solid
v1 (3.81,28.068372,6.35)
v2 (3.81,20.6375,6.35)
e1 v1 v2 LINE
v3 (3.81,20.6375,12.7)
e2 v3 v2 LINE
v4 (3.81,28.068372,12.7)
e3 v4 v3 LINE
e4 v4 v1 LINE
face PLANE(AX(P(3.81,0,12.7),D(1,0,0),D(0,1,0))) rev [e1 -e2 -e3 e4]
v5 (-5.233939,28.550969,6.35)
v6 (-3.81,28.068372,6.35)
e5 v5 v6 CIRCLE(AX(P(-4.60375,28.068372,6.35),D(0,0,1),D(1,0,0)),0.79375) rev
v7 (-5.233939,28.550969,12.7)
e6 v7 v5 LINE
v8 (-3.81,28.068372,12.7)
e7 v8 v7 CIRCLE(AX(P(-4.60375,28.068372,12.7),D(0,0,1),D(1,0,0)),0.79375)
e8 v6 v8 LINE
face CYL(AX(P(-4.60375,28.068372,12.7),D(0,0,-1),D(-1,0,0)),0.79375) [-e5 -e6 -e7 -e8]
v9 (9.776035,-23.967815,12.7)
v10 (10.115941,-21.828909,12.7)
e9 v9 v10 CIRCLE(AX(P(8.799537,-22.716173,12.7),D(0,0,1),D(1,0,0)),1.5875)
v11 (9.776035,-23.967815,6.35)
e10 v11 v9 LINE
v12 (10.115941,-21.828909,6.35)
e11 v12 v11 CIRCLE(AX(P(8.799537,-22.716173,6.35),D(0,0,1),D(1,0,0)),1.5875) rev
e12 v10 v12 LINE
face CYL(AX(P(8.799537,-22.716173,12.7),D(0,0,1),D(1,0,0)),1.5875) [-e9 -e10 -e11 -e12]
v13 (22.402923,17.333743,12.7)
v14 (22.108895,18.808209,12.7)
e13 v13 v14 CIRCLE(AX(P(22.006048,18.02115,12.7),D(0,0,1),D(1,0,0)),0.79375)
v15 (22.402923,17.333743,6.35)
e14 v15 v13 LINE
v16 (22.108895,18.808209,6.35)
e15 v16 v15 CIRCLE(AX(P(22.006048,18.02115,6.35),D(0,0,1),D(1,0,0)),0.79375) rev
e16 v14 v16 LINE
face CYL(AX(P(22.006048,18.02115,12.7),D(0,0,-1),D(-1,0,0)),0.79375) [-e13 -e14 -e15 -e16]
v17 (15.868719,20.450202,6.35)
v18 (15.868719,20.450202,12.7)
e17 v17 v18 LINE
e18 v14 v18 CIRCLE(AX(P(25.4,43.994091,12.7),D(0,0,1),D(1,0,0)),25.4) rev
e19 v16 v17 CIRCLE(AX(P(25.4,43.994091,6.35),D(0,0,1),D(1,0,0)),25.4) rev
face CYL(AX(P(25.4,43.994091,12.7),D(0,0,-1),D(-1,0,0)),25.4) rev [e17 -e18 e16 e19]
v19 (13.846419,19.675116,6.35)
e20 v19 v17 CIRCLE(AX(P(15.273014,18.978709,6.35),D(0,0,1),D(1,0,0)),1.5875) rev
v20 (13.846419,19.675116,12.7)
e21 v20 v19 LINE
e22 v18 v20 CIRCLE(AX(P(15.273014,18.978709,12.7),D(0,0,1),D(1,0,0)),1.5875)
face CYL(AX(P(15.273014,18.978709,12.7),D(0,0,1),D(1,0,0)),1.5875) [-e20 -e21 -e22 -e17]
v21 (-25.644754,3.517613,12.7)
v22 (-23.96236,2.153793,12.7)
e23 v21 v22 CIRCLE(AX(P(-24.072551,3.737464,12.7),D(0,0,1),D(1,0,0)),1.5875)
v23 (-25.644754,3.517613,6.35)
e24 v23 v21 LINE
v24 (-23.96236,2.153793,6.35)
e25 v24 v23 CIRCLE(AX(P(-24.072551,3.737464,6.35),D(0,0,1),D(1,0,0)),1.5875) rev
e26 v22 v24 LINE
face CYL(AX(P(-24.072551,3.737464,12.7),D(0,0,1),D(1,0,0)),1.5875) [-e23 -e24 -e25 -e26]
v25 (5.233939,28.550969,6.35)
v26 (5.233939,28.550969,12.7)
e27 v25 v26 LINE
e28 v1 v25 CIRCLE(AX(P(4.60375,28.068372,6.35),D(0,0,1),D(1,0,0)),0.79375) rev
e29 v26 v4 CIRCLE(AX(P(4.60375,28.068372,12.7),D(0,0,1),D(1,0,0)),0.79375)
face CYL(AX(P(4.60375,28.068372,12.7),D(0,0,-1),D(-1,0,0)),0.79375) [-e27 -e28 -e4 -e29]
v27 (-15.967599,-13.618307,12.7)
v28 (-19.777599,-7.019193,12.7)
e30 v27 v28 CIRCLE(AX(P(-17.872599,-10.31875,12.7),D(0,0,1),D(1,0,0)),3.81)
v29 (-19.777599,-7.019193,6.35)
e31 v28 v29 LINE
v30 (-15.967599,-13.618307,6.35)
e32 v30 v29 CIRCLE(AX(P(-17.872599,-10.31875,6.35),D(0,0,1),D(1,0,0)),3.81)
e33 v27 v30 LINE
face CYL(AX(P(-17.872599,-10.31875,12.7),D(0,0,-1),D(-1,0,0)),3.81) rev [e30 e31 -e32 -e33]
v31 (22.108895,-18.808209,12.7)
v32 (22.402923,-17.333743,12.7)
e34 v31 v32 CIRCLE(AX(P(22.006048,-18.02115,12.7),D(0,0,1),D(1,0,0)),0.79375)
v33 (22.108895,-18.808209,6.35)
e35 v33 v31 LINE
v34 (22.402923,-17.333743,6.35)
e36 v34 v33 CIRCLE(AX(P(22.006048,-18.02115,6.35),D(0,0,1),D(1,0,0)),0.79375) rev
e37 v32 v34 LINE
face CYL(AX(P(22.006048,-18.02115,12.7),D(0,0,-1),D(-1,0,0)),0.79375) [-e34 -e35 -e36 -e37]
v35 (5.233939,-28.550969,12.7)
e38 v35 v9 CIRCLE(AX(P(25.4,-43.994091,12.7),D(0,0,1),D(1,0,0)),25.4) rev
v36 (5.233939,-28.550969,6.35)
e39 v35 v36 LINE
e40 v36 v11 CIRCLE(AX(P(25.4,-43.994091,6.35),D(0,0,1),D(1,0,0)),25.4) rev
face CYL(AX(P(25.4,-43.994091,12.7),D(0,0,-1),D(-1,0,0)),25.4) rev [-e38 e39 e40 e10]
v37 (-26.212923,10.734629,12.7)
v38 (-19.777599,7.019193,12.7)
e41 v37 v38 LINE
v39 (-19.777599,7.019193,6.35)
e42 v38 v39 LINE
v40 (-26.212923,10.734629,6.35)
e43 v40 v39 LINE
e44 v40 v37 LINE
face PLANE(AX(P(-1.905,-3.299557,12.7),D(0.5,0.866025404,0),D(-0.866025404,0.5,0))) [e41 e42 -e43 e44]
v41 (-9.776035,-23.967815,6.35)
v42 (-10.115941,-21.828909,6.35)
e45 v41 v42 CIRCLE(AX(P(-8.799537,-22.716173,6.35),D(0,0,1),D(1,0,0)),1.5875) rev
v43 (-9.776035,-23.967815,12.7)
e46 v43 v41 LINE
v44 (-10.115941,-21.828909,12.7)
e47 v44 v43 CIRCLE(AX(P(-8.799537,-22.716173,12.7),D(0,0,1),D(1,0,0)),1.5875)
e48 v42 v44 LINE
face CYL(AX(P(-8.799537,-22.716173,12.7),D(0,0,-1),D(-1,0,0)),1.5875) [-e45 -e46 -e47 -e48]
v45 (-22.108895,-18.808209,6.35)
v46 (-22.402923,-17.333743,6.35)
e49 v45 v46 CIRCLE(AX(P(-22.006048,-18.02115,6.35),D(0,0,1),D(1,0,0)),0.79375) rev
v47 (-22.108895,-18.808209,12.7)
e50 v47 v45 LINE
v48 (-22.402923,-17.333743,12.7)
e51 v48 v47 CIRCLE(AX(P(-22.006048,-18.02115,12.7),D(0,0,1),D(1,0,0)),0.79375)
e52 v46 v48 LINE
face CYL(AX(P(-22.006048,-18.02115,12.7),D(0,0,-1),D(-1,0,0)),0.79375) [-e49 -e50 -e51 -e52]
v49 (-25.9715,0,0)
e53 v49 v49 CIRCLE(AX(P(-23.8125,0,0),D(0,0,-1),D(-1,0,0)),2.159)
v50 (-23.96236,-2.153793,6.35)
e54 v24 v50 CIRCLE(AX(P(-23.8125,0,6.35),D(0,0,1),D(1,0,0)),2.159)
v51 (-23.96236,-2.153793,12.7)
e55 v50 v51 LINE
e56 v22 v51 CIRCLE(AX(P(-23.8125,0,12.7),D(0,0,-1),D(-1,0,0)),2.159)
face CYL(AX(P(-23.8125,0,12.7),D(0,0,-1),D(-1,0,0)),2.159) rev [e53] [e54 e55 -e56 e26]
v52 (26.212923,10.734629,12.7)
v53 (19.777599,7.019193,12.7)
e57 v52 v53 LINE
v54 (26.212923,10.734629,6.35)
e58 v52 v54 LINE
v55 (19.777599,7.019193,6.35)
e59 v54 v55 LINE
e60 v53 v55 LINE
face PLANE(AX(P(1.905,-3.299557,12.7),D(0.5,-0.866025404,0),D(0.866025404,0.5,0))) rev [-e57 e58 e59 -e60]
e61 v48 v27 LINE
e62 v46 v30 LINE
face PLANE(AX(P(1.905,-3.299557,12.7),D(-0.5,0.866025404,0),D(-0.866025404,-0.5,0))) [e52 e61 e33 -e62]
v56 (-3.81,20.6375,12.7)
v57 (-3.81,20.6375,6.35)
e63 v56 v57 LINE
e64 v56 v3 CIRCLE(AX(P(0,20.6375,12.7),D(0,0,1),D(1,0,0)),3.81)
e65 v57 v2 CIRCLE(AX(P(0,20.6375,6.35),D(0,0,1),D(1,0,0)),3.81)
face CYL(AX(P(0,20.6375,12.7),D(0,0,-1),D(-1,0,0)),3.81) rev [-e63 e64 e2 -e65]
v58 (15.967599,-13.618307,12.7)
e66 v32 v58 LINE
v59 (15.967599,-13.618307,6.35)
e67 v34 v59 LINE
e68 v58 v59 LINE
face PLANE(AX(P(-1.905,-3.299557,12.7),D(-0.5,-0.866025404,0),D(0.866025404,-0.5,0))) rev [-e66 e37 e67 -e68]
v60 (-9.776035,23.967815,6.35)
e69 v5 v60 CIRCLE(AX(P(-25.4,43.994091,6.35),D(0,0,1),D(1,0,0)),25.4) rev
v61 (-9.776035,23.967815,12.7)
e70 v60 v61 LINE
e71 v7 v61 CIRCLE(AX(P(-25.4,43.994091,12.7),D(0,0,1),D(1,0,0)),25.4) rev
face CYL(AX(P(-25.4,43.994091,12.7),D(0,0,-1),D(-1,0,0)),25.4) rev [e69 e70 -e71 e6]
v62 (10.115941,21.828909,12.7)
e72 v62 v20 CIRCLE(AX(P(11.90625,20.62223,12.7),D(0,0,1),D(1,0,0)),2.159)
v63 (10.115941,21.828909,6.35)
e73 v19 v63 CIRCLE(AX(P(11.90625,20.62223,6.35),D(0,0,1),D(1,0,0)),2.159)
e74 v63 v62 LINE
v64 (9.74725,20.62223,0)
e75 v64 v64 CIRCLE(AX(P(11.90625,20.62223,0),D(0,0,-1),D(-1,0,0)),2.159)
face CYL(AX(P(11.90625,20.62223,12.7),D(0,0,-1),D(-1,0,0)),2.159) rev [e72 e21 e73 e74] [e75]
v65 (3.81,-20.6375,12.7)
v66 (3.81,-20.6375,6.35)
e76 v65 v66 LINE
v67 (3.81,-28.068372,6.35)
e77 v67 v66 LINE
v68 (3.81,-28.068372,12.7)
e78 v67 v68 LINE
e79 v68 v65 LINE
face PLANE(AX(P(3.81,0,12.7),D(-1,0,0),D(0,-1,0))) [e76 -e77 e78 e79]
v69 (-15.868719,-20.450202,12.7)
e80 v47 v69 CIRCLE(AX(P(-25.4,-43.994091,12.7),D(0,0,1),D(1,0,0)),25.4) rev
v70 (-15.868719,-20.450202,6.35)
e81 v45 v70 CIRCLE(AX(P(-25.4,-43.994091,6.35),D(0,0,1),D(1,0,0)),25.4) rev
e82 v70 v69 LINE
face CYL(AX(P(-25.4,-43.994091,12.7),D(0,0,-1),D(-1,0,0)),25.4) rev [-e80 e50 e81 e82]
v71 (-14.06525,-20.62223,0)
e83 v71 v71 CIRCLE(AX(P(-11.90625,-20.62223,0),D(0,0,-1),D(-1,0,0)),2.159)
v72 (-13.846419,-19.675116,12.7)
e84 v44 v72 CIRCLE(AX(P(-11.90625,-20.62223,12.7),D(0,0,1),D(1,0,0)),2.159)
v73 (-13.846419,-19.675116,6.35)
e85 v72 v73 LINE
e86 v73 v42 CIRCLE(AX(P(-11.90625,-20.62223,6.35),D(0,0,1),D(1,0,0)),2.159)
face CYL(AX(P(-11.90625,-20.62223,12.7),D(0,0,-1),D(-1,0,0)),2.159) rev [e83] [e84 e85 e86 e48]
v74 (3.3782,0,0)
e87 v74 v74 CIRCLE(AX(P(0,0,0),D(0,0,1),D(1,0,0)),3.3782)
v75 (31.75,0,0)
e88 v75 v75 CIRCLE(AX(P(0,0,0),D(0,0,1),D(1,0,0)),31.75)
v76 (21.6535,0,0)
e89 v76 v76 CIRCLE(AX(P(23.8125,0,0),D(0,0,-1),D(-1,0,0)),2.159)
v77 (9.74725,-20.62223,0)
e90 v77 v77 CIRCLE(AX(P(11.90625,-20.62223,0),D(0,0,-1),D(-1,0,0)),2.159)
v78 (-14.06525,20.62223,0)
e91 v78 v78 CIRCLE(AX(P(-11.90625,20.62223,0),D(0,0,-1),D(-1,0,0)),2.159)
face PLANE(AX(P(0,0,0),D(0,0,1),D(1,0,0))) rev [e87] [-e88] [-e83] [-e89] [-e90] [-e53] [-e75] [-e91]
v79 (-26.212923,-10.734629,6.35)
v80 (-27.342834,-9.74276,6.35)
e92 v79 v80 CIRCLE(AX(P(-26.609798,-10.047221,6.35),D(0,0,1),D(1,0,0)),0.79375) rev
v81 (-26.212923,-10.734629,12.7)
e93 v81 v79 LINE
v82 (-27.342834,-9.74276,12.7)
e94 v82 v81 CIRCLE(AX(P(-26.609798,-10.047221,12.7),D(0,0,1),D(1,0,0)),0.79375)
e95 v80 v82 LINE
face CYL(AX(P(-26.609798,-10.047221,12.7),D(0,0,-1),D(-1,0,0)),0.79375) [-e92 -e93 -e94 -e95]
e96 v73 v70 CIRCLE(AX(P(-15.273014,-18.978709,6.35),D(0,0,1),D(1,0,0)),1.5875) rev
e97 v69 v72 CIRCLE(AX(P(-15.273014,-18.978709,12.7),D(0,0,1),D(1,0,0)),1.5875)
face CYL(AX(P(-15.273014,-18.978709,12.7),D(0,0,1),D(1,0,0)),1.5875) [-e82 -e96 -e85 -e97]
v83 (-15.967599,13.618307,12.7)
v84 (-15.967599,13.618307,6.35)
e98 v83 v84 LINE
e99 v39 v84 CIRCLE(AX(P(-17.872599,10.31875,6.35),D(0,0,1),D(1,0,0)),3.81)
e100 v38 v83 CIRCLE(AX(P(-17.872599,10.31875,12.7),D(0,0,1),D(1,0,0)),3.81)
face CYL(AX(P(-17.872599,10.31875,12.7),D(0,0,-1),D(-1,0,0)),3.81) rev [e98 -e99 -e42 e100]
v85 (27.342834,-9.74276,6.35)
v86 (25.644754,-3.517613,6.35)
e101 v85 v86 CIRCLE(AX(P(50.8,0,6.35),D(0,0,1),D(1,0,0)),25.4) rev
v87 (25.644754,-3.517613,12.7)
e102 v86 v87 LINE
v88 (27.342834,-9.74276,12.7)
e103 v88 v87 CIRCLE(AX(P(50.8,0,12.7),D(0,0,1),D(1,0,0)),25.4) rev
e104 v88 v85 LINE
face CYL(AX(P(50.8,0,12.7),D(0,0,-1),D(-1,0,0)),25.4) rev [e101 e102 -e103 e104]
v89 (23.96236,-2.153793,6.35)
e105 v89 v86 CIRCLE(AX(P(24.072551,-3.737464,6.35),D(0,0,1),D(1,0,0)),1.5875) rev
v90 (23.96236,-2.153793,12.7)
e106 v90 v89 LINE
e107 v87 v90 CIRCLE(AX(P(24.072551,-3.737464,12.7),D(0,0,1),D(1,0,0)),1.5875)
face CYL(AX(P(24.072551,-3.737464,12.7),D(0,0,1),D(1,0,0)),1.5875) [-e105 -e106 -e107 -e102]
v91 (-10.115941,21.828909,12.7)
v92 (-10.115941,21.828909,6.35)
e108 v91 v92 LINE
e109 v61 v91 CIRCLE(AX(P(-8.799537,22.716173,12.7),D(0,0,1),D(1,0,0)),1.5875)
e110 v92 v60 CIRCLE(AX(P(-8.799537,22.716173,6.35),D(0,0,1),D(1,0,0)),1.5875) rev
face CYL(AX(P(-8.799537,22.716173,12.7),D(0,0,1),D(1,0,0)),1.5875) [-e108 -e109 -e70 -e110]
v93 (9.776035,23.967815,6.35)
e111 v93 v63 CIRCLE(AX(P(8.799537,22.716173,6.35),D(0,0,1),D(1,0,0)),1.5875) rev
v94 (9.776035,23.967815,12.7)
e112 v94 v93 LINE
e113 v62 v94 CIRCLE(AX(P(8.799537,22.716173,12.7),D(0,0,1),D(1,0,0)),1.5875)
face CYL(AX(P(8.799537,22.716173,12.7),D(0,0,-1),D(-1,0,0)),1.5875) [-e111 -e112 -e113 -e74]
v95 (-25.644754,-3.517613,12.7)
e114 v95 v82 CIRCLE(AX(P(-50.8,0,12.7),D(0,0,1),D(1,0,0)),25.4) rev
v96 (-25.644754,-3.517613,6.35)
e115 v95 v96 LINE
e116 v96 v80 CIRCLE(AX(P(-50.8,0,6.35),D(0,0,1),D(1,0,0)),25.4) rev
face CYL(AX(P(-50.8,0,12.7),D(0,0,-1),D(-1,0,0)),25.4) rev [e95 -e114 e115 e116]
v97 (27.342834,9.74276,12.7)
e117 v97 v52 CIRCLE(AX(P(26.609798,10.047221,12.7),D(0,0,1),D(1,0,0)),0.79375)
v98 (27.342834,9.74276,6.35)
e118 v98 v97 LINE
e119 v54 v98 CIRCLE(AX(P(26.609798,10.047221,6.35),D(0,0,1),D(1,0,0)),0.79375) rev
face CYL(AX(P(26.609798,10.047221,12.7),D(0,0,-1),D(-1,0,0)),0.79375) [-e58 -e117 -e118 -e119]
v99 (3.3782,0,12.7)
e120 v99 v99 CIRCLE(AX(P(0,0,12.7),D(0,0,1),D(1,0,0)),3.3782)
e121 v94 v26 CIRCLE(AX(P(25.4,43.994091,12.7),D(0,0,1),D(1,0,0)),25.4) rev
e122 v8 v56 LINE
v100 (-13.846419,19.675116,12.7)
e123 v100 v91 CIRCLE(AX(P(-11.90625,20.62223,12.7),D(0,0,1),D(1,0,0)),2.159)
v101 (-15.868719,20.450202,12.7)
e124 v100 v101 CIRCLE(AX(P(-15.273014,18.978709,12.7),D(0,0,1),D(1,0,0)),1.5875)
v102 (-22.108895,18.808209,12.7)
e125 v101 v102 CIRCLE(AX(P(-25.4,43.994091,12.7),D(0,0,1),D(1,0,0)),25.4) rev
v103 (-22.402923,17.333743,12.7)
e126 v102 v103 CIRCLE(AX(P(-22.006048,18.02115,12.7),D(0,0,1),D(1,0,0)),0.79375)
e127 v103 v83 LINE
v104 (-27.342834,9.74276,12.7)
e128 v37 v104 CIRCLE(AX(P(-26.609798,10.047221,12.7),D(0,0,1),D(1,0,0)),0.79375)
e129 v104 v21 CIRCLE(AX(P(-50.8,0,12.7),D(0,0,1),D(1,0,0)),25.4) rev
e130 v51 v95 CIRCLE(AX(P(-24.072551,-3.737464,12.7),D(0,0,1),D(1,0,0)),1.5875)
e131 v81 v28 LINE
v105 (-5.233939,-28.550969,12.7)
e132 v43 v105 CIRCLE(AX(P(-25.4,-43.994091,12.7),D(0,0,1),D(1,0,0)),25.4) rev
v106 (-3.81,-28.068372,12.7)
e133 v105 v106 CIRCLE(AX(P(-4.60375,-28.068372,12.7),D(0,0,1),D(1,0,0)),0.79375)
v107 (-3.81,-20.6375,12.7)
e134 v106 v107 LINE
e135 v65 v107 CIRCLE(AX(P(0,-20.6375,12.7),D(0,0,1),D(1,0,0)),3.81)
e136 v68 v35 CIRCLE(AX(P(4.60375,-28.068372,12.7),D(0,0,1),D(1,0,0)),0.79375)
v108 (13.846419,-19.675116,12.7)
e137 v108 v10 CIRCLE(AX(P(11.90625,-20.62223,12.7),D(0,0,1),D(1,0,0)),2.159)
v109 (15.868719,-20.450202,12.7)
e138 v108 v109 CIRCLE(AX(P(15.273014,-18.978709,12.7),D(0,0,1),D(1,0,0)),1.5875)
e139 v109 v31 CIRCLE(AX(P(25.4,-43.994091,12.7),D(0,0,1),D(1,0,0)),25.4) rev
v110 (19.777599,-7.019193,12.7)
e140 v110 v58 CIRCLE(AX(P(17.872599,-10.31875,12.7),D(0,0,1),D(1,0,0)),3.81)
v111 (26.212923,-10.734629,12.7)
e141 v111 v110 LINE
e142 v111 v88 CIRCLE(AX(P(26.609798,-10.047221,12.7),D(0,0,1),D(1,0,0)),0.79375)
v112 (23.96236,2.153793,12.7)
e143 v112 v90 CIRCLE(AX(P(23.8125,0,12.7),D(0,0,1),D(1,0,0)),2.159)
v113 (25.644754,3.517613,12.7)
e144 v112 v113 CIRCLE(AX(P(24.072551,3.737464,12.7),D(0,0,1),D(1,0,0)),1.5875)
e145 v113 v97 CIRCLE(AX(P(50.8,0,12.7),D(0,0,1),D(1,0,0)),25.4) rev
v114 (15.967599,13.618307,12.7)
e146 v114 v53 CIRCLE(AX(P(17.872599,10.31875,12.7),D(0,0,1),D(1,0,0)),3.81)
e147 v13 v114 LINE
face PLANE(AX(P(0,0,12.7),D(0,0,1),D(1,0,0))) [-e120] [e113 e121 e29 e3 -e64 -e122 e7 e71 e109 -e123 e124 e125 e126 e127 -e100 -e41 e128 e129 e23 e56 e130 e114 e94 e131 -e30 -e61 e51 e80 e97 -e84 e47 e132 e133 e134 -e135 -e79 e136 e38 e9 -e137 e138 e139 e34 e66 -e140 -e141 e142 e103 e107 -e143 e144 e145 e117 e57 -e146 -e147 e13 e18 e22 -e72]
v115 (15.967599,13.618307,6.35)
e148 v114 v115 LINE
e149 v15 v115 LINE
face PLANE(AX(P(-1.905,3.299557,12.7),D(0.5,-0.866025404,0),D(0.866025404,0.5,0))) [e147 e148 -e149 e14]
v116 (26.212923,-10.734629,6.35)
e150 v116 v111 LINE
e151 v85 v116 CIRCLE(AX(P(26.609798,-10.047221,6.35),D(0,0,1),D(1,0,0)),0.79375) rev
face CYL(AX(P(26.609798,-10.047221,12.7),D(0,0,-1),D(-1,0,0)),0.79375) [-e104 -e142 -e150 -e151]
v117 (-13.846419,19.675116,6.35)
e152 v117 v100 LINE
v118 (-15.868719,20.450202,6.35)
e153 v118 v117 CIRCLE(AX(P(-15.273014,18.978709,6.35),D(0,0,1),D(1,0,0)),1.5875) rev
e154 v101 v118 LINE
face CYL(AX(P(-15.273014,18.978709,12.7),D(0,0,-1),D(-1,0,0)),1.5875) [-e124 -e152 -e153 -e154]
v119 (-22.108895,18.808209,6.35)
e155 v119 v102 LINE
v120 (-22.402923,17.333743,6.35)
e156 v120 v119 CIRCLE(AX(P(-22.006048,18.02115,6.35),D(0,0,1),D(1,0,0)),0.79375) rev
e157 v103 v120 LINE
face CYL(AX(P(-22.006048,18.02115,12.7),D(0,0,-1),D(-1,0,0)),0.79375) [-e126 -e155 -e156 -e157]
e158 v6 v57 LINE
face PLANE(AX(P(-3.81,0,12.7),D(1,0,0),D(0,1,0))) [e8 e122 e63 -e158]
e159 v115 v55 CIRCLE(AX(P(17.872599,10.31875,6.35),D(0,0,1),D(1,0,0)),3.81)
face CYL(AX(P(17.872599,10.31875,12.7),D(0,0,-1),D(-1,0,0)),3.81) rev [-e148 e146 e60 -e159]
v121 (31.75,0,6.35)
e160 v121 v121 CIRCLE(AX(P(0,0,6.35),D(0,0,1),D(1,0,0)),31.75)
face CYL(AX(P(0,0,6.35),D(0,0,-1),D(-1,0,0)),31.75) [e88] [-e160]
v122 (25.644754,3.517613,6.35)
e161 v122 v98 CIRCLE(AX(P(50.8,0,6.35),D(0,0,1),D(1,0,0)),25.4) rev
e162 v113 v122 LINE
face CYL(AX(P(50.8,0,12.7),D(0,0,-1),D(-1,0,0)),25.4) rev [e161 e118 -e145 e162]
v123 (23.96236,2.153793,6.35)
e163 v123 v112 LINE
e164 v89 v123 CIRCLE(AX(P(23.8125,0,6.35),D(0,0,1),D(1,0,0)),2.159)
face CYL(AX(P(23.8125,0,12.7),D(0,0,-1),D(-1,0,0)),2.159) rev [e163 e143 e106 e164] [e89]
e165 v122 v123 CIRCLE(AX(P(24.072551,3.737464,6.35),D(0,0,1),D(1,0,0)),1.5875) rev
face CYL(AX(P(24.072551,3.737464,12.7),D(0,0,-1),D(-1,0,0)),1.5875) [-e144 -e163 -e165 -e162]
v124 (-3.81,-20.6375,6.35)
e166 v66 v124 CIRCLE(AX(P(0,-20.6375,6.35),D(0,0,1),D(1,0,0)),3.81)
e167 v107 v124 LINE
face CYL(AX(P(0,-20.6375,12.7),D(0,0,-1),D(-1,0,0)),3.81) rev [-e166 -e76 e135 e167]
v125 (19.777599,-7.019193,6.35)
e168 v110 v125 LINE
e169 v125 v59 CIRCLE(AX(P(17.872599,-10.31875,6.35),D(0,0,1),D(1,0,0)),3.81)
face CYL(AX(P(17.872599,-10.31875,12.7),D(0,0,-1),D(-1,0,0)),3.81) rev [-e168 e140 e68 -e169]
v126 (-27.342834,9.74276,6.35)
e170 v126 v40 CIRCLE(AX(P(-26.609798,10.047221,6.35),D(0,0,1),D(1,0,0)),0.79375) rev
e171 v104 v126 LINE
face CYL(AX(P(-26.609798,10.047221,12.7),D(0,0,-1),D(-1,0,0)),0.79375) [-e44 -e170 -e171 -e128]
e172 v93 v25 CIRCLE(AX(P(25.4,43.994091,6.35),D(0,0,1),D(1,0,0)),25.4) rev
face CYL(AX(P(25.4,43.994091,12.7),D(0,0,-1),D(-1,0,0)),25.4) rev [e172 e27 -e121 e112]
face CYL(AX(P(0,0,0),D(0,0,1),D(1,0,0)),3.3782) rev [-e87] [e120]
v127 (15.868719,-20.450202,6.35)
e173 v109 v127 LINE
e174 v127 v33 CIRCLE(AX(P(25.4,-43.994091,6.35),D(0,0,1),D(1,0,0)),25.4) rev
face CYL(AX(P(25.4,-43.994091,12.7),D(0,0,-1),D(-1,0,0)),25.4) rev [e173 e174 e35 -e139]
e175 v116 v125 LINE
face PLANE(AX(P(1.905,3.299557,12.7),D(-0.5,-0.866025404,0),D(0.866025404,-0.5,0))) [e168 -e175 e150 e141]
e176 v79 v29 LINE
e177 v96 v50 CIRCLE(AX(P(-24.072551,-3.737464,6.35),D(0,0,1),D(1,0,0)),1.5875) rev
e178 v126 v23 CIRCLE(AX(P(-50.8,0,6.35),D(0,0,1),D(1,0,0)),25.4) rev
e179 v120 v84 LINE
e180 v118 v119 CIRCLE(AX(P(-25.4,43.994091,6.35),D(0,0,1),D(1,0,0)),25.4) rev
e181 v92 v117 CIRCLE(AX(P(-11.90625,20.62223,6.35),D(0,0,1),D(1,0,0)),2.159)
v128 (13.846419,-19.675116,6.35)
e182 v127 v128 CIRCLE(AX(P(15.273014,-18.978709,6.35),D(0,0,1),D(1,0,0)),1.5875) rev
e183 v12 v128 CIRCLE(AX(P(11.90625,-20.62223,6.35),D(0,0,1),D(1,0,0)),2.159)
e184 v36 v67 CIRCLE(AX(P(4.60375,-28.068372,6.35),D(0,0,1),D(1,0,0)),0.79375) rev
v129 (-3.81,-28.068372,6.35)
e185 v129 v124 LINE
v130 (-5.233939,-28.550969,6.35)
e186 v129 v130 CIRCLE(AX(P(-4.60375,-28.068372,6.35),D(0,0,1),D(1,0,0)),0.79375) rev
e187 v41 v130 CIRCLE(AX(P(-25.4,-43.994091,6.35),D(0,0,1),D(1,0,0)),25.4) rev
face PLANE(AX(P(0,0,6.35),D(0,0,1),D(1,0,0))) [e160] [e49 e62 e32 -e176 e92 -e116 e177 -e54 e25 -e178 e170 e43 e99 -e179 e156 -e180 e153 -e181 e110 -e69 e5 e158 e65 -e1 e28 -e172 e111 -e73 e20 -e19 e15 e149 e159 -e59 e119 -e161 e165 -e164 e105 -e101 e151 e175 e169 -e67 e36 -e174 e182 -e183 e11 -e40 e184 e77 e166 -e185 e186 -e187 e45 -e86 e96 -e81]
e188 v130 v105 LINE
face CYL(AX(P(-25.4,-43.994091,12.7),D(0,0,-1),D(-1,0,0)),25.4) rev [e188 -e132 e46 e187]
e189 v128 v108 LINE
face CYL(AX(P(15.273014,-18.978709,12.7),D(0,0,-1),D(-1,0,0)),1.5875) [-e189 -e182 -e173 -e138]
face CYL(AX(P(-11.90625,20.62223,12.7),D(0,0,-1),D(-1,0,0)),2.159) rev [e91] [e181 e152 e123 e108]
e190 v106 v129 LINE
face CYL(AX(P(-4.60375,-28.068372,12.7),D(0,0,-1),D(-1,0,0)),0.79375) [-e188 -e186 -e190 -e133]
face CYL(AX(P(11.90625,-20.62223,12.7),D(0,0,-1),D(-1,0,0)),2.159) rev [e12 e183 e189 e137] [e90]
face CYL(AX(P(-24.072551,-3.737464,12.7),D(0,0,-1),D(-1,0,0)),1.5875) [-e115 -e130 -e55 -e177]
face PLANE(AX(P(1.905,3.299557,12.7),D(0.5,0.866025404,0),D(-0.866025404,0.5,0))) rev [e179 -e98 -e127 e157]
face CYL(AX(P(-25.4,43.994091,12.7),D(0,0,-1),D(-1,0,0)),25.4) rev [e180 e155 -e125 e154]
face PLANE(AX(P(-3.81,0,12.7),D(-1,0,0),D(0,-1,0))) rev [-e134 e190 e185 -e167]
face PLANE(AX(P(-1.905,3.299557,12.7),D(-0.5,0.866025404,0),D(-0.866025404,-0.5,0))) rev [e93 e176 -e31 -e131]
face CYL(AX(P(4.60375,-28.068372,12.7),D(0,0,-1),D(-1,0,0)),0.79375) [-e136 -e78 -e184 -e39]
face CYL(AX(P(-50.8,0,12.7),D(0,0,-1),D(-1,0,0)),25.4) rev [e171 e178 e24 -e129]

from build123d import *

# Parameters (mm, degrees)
SKETCH2_R           = 31.75
BOSS_EXTRUDE1_DEPTH = 6.35
BOSS_EXTRUDE2_DEPTH = 6.35
SKETCH4_R           = 3.3782
CUT_EXTRUDE1_DEPTH  = 47.6627796
FILLET2_R           = 0.79375
SKETCH5_R           = 2.159
CUT_EXTRUDE2_DEPTH  = 47.6627796
FILLET3_R           = 1.5875


with BuildPart() as part:
    # Sketch2 → Boss-Extrude1 (new body)
    with BuildSketch(Plane.XY):
        Circle(SKETCH2_R)
    extrude(amount=BOSS_EXTRUDE1_DEPTH)

    # Sketch3 → Boss-Extrude2 (add)
    with BuildSketch(Plane.XY.offset(6.35)):
        with BuildLine():
            Line((3.81, 30.613810246), (3.81, 20.6375))
            ThreePointArc((3.81, 20.6375), (0, 16.8275), (-3.81, 20.6375))
            Line((-3.81, 20.6375), (-3.81, 30.613810246))
            ThreePointArc((-3.81, 30.613810246), (-12.7, 21.997045256), (-24.60733738, 18.606461911))
            Line((-24.60733738, 18.606461911), (-15.967599271, 13.618306788))
            ThreePointArc((-15.967599271, 13.618306788), (-14.573042482, 8.41375), (-19.777599271, 7.019193212))
            Line((-19.777599271, 7.019193212), (-28.41733738, 12.007348335))
            ThreePointArc((-28.41733738, 12.007348335), (-25.4, 0), (-28.41733738, -12.007348335))
            Line((-28.41733738, -12.007348335), (-19.777599271, -7.019193212))
            ThreePointArc((-19.777599271, -7.019193212), (-14.573042482, -8.41375), (-15.967599271, -13.618306788))
            Line((-15.967599271, -13.618306788), (-24.60733738, -18.606461911))
            ThreePointArc((-24.60733738, -18.606461911), (-12.7, -21.997045256), (-3.81, -30.613810246))
            Line((-3.81, -30.613810246), (-3.81, -20.6375))
            ThreePointArc((-3.81, -20.6375), (0, -16.8275), (3.81, -20.6375))
            Line((3.81, -20.6375), (3.81, -30.613810246))
            ThreePointArc((3.81, -30.613810246), (12.7, -21.997045256), (24.60733738, -18.606461911))
            Line((24.60733738, -18.606461911), (15.967599271, -13.618306788))
            ThreePointArc((15.967599271, -13.618306788), (14.573042482, -8.41375), (19.777599271, -7.019193212))
            Line((19.777599271, -7.019193212), (28.41733738, -12.007348335))
            ThreePointArc((28.41733738, -12.007348335), (25.4, 0), (28.41733738, 12.007348335))
            Line((28.41733738, 12.007348335), (19.777599271, 7.019193212))
            ThreePointArc((19.777599271, 7.019193212), (14.573042482, 8.41375), (15.967599271, 13.618306788))
            Line((15.967599271, 13.618306788), (24.60733738, 18.606461911))
            ThreePointArc((24.60733738, 18.606461911), (12.7, 21.997045256), (3.81, 30.613810246))
        make_face()
    extrude(amount=BOSS_EXTRUDE2_DEPTH)

    # Sketch4 → Cut-Extrude1 (cut, through all)
    with BuildSketch(Plane.XY.offset(12.7)):
        Circle(SKETCH4_R)
    extrude(amount=-CUT_EXTRUDE1_DEPTH, mode=Mode.SUBTRACT)

    # Fillet2
    fillet2_edges = [part.edges().sort_by_distance(p)[0] for p in [
        (-28.41733738, 12.007348335, 9.525),
        (-28.41733738, -12.007348335, 9.525),
        (-24.60733738, -18.606461911, 9.525),
        (-3.81, -30.613810246, 9.525),
        (3.81, -30.613810246, 9.525),
        (24.60733738, -18.606461911, 9.525),
        (28.41733738, -12.007348335, 9.525),
        (28.41733738, 12.007348335, 9.525),
        (24.60733738, 18.606461911, 9.525),
        (3.81, 30.613810246, 9.525),
        (-3.81, 30.613810246, 9.525),
        (-24.60733738, 18.606461911, 9.525),
    ]]
    fillet(fillet2_edges, radius=FILLET2_R)

    # Sketch5 → Cut-Extrude2 (cut, through all)
    with BuildSketch(Plane(origin=(0, 0, 0), x_dir=(-1, 0, 0), z_dir=(0, 0, -1))):
        with Locations((-11.90625, 20.622229928)):
            Circle(SKETCH5_R)
        with Locations((11.90625, 20.622229928)):
            Circle(SKETCH5_R)
        with Locations((23.8125, 0)):
            Circle(SKETCH5_R)
        with Locations((11.90625, -20.622229928)):
            Circle(SKETCH5_R)
        with Locations((-11.90625, -20.622229928)):
            Circle(SKETCH5_R)
        with Locations((-23.8125, 0)):
            Circle(SKETCH5_R)
    extrude(amount=-CUT_EXTRUDE2_DEPTH, mode=Mode.SUBTRACT)

    # Fillet3
    # the kernel refuses this fillet: 1.5875 mm, written as the material it takes off along each edge
    with BuildSketch(Plane(origin=(25.439668824, 1.419014665, 17.971488678), x_dir=(-0.8953649723474578, 0.44533309588805103, 0), z_dir=(0, 0, -1)), Plane(origin=(13.94873716, -21.321892132, 17.971488678), x_dir=(-0.06201271198897514, 0.9980753596556587, 0), z_dir=(0, 0, -1)), Plane(origin=(-11.490931663, -22.740906798, 17.971488678), x_dir=(0.8333522603583458, 0.5527422637682374, 0), z_dir=(0, 0, -1)), Plane(origin=(-25.439668824, -1.419014665, 17.971488678), x_dir=(0.8953649723478783, -0.4453330958872058, 0), z_dir=(0, 0, -1)), Plane(origin=(-13.94873716, 21.321892132, 17.971488678), x_dir=(0.062012711989375524, -0.9980753596556338, 0), z_dir=(0, 0, -1)), Plane(origin=(11.490931663, 22.740906798, 17.971488678), x_dir=(-0.833352260358639, -0.5527422637677954, 0), z_dir=(0, 0, -1))) as fillet3_piece_1:
        with BuildLine():
            CenterArc((2.256551384, 1.467035409), FILLET3_R, 161.515751163, 86.019798363)
            ThreePointArc((0.75094916, 1.970342665), (0.395929534, 0.977375414), (0, 0))
            ThreePointArc((0, 0), (0.824975775, 0.163831844), (1.64995155, 0))
        make_face()
    extrude(amount=11.621488678, mode=Mode.SUBTRACT)
    with BuildSketch(Plane(origin=(25.439668824, -1.419014665, 17.971488678), x_dir=(0.0972615315412338, -0.9952588580275252, 0), z_dir=(0, 0, -1)), Plane(origin=(11.490931663, -22.740906798, 17.971488678), x_dir=(-0.8132886886226869, -0.5818603861394845, 0), z_dir=(0, 0, -1)), Plane(origin=(-13.94873716, -21.321892132, 17.971488678), x_dir=(-0.9105502201639706, 0.4133984718880137, 0), z_dir=(0, 0, -1)), Plane(origin=(-25.439668824, 1.419014665, 17.971488678), x_dir=(-0.09726153154127824, 0.9952588580275209, 0), z_dir=(0, 0, -1)), Plane(origin=(-11.490931663, 22.740906798, 17.971488678), x_dir=(0.8132886886227111, 0.5818603861394509, 0), z_dir=(0, 0, -1)), Plane(origin=(13.94873716, 21.321892132, 17.971488678), x_dir=(0.9105502201639338, -0.41339847188809425, 0), z_dir=(0, 0, -1))) as fillet3_piece_2:
        with BuildLine():
            CenterArc((2.17448908, 1.586131862), FILLET3_R, 181.601297313, 86.019798363)
            ThreePointArc((0.587609026, 1.541770329), (0.446894509, 0.71253856), (0, 0))
            ThreePointArc((0, 0), (1.054297736, 0.021890215), (2.108595471, 0))
        make_face()
    extrude(amount=11.621488678, mode=Mode.SUBTRACT)


solid = part.part
